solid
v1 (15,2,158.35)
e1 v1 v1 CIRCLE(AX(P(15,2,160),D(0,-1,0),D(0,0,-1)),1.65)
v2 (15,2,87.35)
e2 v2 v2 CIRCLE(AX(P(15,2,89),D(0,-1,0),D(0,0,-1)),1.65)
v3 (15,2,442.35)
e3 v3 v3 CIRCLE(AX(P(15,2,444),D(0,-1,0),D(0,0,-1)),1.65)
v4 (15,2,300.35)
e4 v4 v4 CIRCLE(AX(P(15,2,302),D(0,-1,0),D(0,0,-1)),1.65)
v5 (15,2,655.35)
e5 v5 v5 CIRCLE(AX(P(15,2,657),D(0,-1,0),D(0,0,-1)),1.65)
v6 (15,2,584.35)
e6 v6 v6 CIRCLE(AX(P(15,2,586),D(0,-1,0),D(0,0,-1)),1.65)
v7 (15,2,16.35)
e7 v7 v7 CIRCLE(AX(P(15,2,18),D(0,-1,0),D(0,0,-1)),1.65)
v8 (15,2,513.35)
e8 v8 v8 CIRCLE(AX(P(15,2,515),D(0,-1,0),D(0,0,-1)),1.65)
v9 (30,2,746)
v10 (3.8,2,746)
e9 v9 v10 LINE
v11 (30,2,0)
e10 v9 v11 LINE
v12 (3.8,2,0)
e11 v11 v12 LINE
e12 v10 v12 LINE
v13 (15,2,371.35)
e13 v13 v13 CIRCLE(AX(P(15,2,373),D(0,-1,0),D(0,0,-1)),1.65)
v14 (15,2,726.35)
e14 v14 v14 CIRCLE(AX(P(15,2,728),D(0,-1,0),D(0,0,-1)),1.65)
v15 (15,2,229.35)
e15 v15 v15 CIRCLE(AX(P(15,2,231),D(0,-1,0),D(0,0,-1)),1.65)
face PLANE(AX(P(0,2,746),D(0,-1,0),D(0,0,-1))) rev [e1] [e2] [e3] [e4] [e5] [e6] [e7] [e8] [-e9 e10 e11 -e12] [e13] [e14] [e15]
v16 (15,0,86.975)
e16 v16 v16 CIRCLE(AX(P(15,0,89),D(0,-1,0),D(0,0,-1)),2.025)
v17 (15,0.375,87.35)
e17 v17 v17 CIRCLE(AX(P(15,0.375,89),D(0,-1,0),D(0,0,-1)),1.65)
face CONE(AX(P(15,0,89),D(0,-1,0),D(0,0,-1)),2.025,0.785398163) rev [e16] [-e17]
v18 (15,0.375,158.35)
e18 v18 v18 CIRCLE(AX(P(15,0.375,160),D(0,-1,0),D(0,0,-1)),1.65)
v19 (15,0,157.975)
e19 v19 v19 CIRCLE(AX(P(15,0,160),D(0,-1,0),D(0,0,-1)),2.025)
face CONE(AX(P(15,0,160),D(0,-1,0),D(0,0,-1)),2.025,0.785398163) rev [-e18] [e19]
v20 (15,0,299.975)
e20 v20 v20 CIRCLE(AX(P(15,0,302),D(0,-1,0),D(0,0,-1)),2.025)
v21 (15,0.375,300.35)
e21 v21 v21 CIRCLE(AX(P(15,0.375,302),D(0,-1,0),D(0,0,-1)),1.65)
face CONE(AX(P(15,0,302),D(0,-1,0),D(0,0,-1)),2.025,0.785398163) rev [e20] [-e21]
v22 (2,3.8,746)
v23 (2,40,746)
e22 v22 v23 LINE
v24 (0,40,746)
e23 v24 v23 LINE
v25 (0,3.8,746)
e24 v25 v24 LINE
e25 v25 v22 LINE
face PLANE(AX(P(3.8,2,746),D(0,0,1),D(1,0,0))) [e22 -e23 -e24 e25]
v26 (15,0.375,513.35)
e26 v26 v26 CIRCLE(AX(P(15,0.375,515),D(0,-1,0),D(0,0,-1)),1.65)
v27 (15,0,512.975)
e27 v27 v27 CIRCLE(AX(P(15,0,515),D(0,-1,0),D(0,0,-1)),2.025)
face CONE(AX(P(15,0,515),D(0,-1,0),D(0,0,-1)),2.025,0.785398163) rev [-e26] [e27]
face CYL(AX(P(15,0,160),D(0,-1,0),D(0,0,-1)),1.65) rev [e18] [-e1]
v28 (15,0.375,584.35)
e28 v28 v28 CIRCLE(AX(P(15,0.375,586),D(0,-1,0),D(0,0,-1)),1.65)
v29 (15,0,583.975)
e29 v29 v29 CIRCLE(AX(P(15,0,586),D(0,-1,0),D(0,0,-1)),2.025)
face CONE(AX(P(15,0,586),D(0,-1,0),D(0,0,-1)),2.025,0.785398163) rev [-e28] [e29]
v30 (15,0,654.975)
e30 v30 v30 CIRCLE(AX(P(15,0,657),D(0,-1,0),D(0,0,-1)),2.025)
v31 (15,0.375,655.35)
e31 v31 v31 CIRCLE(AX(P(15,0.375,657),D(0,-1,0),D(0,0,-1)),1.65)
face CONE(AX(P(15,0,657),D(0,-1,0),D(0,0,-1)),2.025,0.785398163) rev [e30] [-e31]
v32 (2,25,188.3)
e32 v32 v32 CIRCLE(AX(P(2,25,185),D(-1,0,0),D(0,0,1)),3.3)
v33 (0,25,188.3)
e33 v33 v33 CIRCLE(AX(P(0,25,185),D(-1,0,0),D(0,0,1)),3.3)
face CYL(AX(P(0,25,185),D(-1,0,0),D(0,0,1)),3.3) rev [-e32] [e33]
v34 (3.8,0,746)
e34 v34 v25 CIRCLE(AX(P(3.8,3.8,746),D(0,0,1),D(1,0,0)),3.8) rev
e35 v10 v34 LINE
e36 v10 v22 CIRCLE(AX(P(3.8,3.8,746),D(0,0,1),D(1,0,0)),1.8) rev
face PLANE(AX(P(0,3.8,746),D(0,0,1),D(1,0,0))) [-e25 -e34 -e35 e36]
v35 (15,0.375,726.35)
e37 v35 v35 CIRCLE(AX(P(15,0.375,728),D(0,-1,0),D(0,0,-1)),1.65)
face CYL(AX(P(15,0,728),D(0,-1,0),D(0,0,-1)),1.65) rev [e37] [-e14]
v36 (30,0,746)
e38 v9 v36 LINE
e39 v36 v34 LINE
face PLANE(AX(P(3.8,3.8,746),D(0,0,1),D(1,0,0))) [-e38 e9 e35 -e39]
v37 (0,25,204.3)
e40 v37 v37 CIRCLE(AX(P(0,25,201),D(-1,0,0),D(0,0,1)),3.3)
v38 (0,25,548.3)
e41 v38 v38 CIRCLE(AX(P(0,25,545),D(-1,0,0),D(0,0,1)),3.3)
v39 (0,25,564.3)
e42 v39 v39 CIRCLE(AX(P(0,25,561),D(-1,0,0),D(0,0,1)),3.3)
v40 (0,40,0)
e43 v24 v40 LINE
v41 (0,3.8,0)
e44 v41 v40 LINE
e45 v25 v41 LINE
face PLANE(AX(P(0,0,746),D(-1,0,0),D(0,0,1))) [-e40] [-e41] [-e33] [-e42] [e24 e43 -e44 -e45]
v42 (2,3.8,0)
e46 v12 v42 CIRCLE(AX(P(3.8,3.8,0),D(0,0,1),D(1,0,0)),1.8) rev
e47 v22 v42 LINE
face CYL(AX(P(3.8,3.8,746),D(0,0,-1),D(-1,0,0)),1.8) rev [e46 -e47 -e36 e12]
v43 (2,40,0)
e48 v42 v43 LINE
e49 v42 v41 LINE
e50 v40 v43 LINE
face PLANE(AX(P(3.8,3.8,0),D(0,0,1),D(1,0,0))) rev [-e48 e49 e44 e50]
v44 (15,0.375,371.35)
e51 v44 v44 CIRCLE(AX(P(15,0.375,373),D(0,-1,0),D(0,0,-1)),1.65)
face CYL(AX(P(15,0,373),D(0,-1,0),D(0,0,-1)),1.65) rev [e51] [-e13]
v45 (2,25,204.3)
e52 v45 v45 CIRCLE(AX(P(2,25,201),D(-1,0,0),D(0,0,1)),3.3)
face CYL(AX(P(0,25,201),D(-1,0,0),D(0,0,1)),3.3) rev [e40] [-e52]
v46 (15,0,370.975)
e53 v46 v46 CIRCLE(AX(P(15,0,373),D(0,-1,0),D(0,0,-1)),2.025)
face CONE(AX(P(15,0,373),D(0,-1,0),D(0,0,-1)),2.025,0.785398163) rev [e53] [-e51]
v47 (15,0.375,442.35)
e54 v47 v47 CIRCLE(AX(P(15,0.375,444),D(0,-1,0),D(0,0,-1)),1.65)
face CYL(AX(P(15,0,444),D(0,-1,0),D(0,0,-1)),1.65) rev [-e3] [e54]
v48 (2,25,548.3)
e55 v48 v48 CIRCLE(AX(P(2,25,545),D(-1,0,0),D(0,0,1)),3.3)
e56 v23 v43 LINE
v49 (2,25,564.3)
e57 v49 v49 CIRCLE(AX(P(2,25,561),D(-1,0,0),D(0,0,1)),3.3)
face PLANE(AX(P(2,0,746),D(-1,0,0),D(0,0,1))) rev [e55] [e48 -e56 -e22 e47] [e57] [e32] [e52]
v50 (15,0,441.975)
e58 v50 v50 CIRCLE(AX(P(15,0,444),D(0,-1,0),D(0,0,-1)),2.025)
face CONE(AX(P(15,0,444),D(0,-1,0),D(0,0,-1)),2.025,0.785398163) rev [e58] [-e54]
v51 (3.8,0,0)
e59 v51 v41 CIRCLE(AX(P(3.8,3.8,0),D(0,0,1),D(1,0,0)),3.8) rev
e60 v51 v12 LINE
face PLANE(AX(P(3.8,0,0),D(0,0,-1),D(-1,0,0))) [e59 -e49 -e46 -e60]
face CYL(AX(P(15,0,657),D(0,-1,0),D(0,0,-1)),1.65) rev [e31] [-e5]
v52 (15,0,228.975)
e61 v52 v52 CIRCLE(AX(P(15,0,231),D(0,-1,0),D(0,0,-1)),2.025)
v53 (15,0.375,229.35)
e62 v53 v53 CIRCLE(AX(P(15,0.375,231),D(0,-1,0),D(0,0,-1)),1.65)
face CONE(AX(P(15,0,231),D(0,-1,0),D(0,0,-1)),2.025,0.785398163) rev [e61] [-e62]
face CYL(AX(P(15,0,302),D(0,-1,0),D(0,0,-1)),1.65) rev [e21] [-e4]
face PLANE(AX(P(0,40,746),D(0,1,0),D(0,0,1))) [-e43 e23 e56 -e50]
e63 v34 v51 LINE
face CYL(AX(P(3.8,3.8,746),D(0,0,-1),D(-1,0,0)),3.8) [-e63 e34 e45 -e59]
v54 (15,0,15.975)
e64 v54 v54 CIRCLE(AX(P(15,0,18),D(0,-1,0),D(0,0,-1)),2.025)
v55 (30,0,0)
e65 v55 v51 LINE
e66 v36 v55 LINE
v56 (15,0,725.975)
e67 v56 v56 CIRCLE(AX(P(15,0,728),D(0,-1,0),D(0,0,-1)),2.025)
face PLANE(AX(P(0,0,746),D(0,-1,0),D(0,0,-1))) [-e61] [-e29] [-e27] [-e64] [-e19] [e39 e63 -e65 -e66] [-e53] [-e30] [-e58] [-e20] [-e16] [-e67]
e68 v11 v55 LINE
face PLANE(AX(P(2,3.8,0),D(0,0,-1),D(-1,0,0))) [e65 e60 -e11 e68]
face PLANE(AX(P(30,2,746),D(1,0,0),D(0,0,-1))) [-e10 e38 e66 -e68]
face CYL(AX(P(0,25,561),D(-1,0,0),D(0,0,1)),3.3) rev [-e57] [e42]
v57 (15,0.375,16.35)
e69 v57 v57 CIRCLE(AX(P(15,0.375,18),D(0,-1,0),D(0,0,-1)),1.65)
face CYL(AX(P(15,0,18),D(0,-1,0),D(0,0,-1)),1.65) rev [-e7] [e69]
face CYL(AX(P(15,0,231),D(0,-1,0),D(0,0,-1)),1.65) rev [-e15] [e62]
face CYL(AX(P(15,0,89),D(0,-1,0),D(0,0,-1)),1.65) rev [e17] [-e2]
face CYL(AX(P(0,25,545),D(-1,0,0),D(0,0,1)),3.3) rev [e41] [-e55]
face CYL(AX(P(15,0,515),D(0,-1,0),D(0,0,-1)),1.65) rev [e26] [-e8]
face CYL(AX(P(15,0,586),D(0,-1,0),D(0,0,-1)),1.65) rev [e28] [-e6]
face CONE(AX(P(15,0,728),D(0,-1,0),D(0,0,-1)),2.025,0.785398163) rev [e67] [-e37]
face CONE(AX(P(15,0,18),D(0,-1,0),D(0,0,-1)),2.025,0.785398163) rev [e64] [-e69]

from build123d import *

# Parameters (mm, degrees)
SM_BASE_FLANGE_1_DEPTH      = 746
HOLE_WIZARD_M41_D           = 3.3
HOLE_WIZARD_M41_DEPTH       = 11.5
HOLE_WIZARD_M41_CSINK_D     = 4.05
HOLE_WIZARD_M41_CSINK_ANGLE = 90
HOLE_WIZARD_M41_TIP         = 0.991420021
HOLE_WIZARD_M61_D           = 6.6
HOLE_WIZARD_M61_DEPTH       = 59
HOLE_WIZARD_M61_TIP         = 1.982840043


# Sheet-metal steps are written as plain solids
with BuildPart() as part:
    # Sketch 1 → Базовая кромка1 (new body)
    with BuildSketch(Plane.XY):
        with BuildLine():
            Line((0, 40), (0, 3.8))
            ThreePointArc((0, 3.8), (1.112994231, 1.112994231), (3.8, 0))
            Line((3.8, 0), (30, 0))
            Line((30, 0), (30, 2))
            Line((30, 2), (3.8, 2))
            ThreePointArc((3.8, 2), (2.527207794, 2.527207794), (2, 3.8))
            Line((2, 3.8), (2, 40))
            Line((2, 40), (0, 40))
        make_face()
    extrude(amount=SM_BASE_FLANGE_1_DEPTH)

    # Отверстие обработанное метчиком M41
    with Locations(Plane(origin=(0, 0, 0), x_dir=(-1, 0, 0), z_dir=(0, -1, 0))):
        with Locations((-15, -18), (-15, -89), (-15, -160), (-15, -231), (-15, -302), (-15, -373), (-15, -444), (-15, -515), (-15, -586), (-15, -657), (-15, -728)):
            CounterSinkHole(HOLE_WIZARD_M41_D / 2, HOLE_WIZARD_M41_CSINK_D / 2, depth=HOLE_WIZARD_M41_DEPTH, counter_sink_angle=HOLE_WIZARD_M41_CSINK_ANGLE)
            with Locations((0, 0, -(HOLE_WIZARD_M41_DEPTH + HOLE_WIZARD_M41_TIP / 2))):  # 118° drill point
                Cone(0, HOLE_WIZARD_M41_D / 2, HOLE_WIZARD_M41_TIP, mode=Mode.SUBTRACT)

    # Отверстие с зазором M61
    with Locations(Plane.ZY):
        with Locations((561, 25), (545, 25), (185, 25), (201, 25)):
            Hole(HOLE_WIZARD_M61_D / 2, depth=HOLE_WIZARD_M61_DEPTH)
            with Locations((0, 0, -(HOLE_WIZARD_M61_DEPTH + HOLE_WIZARD_M61_TIP / 2))):  # 118° drill point
                Cone(0, HOLE_WIZARD_M61_D / 2, HOLE_WIZARD_M61_TIP, mode=Mode.SUBTRACT)


solid = part.part
